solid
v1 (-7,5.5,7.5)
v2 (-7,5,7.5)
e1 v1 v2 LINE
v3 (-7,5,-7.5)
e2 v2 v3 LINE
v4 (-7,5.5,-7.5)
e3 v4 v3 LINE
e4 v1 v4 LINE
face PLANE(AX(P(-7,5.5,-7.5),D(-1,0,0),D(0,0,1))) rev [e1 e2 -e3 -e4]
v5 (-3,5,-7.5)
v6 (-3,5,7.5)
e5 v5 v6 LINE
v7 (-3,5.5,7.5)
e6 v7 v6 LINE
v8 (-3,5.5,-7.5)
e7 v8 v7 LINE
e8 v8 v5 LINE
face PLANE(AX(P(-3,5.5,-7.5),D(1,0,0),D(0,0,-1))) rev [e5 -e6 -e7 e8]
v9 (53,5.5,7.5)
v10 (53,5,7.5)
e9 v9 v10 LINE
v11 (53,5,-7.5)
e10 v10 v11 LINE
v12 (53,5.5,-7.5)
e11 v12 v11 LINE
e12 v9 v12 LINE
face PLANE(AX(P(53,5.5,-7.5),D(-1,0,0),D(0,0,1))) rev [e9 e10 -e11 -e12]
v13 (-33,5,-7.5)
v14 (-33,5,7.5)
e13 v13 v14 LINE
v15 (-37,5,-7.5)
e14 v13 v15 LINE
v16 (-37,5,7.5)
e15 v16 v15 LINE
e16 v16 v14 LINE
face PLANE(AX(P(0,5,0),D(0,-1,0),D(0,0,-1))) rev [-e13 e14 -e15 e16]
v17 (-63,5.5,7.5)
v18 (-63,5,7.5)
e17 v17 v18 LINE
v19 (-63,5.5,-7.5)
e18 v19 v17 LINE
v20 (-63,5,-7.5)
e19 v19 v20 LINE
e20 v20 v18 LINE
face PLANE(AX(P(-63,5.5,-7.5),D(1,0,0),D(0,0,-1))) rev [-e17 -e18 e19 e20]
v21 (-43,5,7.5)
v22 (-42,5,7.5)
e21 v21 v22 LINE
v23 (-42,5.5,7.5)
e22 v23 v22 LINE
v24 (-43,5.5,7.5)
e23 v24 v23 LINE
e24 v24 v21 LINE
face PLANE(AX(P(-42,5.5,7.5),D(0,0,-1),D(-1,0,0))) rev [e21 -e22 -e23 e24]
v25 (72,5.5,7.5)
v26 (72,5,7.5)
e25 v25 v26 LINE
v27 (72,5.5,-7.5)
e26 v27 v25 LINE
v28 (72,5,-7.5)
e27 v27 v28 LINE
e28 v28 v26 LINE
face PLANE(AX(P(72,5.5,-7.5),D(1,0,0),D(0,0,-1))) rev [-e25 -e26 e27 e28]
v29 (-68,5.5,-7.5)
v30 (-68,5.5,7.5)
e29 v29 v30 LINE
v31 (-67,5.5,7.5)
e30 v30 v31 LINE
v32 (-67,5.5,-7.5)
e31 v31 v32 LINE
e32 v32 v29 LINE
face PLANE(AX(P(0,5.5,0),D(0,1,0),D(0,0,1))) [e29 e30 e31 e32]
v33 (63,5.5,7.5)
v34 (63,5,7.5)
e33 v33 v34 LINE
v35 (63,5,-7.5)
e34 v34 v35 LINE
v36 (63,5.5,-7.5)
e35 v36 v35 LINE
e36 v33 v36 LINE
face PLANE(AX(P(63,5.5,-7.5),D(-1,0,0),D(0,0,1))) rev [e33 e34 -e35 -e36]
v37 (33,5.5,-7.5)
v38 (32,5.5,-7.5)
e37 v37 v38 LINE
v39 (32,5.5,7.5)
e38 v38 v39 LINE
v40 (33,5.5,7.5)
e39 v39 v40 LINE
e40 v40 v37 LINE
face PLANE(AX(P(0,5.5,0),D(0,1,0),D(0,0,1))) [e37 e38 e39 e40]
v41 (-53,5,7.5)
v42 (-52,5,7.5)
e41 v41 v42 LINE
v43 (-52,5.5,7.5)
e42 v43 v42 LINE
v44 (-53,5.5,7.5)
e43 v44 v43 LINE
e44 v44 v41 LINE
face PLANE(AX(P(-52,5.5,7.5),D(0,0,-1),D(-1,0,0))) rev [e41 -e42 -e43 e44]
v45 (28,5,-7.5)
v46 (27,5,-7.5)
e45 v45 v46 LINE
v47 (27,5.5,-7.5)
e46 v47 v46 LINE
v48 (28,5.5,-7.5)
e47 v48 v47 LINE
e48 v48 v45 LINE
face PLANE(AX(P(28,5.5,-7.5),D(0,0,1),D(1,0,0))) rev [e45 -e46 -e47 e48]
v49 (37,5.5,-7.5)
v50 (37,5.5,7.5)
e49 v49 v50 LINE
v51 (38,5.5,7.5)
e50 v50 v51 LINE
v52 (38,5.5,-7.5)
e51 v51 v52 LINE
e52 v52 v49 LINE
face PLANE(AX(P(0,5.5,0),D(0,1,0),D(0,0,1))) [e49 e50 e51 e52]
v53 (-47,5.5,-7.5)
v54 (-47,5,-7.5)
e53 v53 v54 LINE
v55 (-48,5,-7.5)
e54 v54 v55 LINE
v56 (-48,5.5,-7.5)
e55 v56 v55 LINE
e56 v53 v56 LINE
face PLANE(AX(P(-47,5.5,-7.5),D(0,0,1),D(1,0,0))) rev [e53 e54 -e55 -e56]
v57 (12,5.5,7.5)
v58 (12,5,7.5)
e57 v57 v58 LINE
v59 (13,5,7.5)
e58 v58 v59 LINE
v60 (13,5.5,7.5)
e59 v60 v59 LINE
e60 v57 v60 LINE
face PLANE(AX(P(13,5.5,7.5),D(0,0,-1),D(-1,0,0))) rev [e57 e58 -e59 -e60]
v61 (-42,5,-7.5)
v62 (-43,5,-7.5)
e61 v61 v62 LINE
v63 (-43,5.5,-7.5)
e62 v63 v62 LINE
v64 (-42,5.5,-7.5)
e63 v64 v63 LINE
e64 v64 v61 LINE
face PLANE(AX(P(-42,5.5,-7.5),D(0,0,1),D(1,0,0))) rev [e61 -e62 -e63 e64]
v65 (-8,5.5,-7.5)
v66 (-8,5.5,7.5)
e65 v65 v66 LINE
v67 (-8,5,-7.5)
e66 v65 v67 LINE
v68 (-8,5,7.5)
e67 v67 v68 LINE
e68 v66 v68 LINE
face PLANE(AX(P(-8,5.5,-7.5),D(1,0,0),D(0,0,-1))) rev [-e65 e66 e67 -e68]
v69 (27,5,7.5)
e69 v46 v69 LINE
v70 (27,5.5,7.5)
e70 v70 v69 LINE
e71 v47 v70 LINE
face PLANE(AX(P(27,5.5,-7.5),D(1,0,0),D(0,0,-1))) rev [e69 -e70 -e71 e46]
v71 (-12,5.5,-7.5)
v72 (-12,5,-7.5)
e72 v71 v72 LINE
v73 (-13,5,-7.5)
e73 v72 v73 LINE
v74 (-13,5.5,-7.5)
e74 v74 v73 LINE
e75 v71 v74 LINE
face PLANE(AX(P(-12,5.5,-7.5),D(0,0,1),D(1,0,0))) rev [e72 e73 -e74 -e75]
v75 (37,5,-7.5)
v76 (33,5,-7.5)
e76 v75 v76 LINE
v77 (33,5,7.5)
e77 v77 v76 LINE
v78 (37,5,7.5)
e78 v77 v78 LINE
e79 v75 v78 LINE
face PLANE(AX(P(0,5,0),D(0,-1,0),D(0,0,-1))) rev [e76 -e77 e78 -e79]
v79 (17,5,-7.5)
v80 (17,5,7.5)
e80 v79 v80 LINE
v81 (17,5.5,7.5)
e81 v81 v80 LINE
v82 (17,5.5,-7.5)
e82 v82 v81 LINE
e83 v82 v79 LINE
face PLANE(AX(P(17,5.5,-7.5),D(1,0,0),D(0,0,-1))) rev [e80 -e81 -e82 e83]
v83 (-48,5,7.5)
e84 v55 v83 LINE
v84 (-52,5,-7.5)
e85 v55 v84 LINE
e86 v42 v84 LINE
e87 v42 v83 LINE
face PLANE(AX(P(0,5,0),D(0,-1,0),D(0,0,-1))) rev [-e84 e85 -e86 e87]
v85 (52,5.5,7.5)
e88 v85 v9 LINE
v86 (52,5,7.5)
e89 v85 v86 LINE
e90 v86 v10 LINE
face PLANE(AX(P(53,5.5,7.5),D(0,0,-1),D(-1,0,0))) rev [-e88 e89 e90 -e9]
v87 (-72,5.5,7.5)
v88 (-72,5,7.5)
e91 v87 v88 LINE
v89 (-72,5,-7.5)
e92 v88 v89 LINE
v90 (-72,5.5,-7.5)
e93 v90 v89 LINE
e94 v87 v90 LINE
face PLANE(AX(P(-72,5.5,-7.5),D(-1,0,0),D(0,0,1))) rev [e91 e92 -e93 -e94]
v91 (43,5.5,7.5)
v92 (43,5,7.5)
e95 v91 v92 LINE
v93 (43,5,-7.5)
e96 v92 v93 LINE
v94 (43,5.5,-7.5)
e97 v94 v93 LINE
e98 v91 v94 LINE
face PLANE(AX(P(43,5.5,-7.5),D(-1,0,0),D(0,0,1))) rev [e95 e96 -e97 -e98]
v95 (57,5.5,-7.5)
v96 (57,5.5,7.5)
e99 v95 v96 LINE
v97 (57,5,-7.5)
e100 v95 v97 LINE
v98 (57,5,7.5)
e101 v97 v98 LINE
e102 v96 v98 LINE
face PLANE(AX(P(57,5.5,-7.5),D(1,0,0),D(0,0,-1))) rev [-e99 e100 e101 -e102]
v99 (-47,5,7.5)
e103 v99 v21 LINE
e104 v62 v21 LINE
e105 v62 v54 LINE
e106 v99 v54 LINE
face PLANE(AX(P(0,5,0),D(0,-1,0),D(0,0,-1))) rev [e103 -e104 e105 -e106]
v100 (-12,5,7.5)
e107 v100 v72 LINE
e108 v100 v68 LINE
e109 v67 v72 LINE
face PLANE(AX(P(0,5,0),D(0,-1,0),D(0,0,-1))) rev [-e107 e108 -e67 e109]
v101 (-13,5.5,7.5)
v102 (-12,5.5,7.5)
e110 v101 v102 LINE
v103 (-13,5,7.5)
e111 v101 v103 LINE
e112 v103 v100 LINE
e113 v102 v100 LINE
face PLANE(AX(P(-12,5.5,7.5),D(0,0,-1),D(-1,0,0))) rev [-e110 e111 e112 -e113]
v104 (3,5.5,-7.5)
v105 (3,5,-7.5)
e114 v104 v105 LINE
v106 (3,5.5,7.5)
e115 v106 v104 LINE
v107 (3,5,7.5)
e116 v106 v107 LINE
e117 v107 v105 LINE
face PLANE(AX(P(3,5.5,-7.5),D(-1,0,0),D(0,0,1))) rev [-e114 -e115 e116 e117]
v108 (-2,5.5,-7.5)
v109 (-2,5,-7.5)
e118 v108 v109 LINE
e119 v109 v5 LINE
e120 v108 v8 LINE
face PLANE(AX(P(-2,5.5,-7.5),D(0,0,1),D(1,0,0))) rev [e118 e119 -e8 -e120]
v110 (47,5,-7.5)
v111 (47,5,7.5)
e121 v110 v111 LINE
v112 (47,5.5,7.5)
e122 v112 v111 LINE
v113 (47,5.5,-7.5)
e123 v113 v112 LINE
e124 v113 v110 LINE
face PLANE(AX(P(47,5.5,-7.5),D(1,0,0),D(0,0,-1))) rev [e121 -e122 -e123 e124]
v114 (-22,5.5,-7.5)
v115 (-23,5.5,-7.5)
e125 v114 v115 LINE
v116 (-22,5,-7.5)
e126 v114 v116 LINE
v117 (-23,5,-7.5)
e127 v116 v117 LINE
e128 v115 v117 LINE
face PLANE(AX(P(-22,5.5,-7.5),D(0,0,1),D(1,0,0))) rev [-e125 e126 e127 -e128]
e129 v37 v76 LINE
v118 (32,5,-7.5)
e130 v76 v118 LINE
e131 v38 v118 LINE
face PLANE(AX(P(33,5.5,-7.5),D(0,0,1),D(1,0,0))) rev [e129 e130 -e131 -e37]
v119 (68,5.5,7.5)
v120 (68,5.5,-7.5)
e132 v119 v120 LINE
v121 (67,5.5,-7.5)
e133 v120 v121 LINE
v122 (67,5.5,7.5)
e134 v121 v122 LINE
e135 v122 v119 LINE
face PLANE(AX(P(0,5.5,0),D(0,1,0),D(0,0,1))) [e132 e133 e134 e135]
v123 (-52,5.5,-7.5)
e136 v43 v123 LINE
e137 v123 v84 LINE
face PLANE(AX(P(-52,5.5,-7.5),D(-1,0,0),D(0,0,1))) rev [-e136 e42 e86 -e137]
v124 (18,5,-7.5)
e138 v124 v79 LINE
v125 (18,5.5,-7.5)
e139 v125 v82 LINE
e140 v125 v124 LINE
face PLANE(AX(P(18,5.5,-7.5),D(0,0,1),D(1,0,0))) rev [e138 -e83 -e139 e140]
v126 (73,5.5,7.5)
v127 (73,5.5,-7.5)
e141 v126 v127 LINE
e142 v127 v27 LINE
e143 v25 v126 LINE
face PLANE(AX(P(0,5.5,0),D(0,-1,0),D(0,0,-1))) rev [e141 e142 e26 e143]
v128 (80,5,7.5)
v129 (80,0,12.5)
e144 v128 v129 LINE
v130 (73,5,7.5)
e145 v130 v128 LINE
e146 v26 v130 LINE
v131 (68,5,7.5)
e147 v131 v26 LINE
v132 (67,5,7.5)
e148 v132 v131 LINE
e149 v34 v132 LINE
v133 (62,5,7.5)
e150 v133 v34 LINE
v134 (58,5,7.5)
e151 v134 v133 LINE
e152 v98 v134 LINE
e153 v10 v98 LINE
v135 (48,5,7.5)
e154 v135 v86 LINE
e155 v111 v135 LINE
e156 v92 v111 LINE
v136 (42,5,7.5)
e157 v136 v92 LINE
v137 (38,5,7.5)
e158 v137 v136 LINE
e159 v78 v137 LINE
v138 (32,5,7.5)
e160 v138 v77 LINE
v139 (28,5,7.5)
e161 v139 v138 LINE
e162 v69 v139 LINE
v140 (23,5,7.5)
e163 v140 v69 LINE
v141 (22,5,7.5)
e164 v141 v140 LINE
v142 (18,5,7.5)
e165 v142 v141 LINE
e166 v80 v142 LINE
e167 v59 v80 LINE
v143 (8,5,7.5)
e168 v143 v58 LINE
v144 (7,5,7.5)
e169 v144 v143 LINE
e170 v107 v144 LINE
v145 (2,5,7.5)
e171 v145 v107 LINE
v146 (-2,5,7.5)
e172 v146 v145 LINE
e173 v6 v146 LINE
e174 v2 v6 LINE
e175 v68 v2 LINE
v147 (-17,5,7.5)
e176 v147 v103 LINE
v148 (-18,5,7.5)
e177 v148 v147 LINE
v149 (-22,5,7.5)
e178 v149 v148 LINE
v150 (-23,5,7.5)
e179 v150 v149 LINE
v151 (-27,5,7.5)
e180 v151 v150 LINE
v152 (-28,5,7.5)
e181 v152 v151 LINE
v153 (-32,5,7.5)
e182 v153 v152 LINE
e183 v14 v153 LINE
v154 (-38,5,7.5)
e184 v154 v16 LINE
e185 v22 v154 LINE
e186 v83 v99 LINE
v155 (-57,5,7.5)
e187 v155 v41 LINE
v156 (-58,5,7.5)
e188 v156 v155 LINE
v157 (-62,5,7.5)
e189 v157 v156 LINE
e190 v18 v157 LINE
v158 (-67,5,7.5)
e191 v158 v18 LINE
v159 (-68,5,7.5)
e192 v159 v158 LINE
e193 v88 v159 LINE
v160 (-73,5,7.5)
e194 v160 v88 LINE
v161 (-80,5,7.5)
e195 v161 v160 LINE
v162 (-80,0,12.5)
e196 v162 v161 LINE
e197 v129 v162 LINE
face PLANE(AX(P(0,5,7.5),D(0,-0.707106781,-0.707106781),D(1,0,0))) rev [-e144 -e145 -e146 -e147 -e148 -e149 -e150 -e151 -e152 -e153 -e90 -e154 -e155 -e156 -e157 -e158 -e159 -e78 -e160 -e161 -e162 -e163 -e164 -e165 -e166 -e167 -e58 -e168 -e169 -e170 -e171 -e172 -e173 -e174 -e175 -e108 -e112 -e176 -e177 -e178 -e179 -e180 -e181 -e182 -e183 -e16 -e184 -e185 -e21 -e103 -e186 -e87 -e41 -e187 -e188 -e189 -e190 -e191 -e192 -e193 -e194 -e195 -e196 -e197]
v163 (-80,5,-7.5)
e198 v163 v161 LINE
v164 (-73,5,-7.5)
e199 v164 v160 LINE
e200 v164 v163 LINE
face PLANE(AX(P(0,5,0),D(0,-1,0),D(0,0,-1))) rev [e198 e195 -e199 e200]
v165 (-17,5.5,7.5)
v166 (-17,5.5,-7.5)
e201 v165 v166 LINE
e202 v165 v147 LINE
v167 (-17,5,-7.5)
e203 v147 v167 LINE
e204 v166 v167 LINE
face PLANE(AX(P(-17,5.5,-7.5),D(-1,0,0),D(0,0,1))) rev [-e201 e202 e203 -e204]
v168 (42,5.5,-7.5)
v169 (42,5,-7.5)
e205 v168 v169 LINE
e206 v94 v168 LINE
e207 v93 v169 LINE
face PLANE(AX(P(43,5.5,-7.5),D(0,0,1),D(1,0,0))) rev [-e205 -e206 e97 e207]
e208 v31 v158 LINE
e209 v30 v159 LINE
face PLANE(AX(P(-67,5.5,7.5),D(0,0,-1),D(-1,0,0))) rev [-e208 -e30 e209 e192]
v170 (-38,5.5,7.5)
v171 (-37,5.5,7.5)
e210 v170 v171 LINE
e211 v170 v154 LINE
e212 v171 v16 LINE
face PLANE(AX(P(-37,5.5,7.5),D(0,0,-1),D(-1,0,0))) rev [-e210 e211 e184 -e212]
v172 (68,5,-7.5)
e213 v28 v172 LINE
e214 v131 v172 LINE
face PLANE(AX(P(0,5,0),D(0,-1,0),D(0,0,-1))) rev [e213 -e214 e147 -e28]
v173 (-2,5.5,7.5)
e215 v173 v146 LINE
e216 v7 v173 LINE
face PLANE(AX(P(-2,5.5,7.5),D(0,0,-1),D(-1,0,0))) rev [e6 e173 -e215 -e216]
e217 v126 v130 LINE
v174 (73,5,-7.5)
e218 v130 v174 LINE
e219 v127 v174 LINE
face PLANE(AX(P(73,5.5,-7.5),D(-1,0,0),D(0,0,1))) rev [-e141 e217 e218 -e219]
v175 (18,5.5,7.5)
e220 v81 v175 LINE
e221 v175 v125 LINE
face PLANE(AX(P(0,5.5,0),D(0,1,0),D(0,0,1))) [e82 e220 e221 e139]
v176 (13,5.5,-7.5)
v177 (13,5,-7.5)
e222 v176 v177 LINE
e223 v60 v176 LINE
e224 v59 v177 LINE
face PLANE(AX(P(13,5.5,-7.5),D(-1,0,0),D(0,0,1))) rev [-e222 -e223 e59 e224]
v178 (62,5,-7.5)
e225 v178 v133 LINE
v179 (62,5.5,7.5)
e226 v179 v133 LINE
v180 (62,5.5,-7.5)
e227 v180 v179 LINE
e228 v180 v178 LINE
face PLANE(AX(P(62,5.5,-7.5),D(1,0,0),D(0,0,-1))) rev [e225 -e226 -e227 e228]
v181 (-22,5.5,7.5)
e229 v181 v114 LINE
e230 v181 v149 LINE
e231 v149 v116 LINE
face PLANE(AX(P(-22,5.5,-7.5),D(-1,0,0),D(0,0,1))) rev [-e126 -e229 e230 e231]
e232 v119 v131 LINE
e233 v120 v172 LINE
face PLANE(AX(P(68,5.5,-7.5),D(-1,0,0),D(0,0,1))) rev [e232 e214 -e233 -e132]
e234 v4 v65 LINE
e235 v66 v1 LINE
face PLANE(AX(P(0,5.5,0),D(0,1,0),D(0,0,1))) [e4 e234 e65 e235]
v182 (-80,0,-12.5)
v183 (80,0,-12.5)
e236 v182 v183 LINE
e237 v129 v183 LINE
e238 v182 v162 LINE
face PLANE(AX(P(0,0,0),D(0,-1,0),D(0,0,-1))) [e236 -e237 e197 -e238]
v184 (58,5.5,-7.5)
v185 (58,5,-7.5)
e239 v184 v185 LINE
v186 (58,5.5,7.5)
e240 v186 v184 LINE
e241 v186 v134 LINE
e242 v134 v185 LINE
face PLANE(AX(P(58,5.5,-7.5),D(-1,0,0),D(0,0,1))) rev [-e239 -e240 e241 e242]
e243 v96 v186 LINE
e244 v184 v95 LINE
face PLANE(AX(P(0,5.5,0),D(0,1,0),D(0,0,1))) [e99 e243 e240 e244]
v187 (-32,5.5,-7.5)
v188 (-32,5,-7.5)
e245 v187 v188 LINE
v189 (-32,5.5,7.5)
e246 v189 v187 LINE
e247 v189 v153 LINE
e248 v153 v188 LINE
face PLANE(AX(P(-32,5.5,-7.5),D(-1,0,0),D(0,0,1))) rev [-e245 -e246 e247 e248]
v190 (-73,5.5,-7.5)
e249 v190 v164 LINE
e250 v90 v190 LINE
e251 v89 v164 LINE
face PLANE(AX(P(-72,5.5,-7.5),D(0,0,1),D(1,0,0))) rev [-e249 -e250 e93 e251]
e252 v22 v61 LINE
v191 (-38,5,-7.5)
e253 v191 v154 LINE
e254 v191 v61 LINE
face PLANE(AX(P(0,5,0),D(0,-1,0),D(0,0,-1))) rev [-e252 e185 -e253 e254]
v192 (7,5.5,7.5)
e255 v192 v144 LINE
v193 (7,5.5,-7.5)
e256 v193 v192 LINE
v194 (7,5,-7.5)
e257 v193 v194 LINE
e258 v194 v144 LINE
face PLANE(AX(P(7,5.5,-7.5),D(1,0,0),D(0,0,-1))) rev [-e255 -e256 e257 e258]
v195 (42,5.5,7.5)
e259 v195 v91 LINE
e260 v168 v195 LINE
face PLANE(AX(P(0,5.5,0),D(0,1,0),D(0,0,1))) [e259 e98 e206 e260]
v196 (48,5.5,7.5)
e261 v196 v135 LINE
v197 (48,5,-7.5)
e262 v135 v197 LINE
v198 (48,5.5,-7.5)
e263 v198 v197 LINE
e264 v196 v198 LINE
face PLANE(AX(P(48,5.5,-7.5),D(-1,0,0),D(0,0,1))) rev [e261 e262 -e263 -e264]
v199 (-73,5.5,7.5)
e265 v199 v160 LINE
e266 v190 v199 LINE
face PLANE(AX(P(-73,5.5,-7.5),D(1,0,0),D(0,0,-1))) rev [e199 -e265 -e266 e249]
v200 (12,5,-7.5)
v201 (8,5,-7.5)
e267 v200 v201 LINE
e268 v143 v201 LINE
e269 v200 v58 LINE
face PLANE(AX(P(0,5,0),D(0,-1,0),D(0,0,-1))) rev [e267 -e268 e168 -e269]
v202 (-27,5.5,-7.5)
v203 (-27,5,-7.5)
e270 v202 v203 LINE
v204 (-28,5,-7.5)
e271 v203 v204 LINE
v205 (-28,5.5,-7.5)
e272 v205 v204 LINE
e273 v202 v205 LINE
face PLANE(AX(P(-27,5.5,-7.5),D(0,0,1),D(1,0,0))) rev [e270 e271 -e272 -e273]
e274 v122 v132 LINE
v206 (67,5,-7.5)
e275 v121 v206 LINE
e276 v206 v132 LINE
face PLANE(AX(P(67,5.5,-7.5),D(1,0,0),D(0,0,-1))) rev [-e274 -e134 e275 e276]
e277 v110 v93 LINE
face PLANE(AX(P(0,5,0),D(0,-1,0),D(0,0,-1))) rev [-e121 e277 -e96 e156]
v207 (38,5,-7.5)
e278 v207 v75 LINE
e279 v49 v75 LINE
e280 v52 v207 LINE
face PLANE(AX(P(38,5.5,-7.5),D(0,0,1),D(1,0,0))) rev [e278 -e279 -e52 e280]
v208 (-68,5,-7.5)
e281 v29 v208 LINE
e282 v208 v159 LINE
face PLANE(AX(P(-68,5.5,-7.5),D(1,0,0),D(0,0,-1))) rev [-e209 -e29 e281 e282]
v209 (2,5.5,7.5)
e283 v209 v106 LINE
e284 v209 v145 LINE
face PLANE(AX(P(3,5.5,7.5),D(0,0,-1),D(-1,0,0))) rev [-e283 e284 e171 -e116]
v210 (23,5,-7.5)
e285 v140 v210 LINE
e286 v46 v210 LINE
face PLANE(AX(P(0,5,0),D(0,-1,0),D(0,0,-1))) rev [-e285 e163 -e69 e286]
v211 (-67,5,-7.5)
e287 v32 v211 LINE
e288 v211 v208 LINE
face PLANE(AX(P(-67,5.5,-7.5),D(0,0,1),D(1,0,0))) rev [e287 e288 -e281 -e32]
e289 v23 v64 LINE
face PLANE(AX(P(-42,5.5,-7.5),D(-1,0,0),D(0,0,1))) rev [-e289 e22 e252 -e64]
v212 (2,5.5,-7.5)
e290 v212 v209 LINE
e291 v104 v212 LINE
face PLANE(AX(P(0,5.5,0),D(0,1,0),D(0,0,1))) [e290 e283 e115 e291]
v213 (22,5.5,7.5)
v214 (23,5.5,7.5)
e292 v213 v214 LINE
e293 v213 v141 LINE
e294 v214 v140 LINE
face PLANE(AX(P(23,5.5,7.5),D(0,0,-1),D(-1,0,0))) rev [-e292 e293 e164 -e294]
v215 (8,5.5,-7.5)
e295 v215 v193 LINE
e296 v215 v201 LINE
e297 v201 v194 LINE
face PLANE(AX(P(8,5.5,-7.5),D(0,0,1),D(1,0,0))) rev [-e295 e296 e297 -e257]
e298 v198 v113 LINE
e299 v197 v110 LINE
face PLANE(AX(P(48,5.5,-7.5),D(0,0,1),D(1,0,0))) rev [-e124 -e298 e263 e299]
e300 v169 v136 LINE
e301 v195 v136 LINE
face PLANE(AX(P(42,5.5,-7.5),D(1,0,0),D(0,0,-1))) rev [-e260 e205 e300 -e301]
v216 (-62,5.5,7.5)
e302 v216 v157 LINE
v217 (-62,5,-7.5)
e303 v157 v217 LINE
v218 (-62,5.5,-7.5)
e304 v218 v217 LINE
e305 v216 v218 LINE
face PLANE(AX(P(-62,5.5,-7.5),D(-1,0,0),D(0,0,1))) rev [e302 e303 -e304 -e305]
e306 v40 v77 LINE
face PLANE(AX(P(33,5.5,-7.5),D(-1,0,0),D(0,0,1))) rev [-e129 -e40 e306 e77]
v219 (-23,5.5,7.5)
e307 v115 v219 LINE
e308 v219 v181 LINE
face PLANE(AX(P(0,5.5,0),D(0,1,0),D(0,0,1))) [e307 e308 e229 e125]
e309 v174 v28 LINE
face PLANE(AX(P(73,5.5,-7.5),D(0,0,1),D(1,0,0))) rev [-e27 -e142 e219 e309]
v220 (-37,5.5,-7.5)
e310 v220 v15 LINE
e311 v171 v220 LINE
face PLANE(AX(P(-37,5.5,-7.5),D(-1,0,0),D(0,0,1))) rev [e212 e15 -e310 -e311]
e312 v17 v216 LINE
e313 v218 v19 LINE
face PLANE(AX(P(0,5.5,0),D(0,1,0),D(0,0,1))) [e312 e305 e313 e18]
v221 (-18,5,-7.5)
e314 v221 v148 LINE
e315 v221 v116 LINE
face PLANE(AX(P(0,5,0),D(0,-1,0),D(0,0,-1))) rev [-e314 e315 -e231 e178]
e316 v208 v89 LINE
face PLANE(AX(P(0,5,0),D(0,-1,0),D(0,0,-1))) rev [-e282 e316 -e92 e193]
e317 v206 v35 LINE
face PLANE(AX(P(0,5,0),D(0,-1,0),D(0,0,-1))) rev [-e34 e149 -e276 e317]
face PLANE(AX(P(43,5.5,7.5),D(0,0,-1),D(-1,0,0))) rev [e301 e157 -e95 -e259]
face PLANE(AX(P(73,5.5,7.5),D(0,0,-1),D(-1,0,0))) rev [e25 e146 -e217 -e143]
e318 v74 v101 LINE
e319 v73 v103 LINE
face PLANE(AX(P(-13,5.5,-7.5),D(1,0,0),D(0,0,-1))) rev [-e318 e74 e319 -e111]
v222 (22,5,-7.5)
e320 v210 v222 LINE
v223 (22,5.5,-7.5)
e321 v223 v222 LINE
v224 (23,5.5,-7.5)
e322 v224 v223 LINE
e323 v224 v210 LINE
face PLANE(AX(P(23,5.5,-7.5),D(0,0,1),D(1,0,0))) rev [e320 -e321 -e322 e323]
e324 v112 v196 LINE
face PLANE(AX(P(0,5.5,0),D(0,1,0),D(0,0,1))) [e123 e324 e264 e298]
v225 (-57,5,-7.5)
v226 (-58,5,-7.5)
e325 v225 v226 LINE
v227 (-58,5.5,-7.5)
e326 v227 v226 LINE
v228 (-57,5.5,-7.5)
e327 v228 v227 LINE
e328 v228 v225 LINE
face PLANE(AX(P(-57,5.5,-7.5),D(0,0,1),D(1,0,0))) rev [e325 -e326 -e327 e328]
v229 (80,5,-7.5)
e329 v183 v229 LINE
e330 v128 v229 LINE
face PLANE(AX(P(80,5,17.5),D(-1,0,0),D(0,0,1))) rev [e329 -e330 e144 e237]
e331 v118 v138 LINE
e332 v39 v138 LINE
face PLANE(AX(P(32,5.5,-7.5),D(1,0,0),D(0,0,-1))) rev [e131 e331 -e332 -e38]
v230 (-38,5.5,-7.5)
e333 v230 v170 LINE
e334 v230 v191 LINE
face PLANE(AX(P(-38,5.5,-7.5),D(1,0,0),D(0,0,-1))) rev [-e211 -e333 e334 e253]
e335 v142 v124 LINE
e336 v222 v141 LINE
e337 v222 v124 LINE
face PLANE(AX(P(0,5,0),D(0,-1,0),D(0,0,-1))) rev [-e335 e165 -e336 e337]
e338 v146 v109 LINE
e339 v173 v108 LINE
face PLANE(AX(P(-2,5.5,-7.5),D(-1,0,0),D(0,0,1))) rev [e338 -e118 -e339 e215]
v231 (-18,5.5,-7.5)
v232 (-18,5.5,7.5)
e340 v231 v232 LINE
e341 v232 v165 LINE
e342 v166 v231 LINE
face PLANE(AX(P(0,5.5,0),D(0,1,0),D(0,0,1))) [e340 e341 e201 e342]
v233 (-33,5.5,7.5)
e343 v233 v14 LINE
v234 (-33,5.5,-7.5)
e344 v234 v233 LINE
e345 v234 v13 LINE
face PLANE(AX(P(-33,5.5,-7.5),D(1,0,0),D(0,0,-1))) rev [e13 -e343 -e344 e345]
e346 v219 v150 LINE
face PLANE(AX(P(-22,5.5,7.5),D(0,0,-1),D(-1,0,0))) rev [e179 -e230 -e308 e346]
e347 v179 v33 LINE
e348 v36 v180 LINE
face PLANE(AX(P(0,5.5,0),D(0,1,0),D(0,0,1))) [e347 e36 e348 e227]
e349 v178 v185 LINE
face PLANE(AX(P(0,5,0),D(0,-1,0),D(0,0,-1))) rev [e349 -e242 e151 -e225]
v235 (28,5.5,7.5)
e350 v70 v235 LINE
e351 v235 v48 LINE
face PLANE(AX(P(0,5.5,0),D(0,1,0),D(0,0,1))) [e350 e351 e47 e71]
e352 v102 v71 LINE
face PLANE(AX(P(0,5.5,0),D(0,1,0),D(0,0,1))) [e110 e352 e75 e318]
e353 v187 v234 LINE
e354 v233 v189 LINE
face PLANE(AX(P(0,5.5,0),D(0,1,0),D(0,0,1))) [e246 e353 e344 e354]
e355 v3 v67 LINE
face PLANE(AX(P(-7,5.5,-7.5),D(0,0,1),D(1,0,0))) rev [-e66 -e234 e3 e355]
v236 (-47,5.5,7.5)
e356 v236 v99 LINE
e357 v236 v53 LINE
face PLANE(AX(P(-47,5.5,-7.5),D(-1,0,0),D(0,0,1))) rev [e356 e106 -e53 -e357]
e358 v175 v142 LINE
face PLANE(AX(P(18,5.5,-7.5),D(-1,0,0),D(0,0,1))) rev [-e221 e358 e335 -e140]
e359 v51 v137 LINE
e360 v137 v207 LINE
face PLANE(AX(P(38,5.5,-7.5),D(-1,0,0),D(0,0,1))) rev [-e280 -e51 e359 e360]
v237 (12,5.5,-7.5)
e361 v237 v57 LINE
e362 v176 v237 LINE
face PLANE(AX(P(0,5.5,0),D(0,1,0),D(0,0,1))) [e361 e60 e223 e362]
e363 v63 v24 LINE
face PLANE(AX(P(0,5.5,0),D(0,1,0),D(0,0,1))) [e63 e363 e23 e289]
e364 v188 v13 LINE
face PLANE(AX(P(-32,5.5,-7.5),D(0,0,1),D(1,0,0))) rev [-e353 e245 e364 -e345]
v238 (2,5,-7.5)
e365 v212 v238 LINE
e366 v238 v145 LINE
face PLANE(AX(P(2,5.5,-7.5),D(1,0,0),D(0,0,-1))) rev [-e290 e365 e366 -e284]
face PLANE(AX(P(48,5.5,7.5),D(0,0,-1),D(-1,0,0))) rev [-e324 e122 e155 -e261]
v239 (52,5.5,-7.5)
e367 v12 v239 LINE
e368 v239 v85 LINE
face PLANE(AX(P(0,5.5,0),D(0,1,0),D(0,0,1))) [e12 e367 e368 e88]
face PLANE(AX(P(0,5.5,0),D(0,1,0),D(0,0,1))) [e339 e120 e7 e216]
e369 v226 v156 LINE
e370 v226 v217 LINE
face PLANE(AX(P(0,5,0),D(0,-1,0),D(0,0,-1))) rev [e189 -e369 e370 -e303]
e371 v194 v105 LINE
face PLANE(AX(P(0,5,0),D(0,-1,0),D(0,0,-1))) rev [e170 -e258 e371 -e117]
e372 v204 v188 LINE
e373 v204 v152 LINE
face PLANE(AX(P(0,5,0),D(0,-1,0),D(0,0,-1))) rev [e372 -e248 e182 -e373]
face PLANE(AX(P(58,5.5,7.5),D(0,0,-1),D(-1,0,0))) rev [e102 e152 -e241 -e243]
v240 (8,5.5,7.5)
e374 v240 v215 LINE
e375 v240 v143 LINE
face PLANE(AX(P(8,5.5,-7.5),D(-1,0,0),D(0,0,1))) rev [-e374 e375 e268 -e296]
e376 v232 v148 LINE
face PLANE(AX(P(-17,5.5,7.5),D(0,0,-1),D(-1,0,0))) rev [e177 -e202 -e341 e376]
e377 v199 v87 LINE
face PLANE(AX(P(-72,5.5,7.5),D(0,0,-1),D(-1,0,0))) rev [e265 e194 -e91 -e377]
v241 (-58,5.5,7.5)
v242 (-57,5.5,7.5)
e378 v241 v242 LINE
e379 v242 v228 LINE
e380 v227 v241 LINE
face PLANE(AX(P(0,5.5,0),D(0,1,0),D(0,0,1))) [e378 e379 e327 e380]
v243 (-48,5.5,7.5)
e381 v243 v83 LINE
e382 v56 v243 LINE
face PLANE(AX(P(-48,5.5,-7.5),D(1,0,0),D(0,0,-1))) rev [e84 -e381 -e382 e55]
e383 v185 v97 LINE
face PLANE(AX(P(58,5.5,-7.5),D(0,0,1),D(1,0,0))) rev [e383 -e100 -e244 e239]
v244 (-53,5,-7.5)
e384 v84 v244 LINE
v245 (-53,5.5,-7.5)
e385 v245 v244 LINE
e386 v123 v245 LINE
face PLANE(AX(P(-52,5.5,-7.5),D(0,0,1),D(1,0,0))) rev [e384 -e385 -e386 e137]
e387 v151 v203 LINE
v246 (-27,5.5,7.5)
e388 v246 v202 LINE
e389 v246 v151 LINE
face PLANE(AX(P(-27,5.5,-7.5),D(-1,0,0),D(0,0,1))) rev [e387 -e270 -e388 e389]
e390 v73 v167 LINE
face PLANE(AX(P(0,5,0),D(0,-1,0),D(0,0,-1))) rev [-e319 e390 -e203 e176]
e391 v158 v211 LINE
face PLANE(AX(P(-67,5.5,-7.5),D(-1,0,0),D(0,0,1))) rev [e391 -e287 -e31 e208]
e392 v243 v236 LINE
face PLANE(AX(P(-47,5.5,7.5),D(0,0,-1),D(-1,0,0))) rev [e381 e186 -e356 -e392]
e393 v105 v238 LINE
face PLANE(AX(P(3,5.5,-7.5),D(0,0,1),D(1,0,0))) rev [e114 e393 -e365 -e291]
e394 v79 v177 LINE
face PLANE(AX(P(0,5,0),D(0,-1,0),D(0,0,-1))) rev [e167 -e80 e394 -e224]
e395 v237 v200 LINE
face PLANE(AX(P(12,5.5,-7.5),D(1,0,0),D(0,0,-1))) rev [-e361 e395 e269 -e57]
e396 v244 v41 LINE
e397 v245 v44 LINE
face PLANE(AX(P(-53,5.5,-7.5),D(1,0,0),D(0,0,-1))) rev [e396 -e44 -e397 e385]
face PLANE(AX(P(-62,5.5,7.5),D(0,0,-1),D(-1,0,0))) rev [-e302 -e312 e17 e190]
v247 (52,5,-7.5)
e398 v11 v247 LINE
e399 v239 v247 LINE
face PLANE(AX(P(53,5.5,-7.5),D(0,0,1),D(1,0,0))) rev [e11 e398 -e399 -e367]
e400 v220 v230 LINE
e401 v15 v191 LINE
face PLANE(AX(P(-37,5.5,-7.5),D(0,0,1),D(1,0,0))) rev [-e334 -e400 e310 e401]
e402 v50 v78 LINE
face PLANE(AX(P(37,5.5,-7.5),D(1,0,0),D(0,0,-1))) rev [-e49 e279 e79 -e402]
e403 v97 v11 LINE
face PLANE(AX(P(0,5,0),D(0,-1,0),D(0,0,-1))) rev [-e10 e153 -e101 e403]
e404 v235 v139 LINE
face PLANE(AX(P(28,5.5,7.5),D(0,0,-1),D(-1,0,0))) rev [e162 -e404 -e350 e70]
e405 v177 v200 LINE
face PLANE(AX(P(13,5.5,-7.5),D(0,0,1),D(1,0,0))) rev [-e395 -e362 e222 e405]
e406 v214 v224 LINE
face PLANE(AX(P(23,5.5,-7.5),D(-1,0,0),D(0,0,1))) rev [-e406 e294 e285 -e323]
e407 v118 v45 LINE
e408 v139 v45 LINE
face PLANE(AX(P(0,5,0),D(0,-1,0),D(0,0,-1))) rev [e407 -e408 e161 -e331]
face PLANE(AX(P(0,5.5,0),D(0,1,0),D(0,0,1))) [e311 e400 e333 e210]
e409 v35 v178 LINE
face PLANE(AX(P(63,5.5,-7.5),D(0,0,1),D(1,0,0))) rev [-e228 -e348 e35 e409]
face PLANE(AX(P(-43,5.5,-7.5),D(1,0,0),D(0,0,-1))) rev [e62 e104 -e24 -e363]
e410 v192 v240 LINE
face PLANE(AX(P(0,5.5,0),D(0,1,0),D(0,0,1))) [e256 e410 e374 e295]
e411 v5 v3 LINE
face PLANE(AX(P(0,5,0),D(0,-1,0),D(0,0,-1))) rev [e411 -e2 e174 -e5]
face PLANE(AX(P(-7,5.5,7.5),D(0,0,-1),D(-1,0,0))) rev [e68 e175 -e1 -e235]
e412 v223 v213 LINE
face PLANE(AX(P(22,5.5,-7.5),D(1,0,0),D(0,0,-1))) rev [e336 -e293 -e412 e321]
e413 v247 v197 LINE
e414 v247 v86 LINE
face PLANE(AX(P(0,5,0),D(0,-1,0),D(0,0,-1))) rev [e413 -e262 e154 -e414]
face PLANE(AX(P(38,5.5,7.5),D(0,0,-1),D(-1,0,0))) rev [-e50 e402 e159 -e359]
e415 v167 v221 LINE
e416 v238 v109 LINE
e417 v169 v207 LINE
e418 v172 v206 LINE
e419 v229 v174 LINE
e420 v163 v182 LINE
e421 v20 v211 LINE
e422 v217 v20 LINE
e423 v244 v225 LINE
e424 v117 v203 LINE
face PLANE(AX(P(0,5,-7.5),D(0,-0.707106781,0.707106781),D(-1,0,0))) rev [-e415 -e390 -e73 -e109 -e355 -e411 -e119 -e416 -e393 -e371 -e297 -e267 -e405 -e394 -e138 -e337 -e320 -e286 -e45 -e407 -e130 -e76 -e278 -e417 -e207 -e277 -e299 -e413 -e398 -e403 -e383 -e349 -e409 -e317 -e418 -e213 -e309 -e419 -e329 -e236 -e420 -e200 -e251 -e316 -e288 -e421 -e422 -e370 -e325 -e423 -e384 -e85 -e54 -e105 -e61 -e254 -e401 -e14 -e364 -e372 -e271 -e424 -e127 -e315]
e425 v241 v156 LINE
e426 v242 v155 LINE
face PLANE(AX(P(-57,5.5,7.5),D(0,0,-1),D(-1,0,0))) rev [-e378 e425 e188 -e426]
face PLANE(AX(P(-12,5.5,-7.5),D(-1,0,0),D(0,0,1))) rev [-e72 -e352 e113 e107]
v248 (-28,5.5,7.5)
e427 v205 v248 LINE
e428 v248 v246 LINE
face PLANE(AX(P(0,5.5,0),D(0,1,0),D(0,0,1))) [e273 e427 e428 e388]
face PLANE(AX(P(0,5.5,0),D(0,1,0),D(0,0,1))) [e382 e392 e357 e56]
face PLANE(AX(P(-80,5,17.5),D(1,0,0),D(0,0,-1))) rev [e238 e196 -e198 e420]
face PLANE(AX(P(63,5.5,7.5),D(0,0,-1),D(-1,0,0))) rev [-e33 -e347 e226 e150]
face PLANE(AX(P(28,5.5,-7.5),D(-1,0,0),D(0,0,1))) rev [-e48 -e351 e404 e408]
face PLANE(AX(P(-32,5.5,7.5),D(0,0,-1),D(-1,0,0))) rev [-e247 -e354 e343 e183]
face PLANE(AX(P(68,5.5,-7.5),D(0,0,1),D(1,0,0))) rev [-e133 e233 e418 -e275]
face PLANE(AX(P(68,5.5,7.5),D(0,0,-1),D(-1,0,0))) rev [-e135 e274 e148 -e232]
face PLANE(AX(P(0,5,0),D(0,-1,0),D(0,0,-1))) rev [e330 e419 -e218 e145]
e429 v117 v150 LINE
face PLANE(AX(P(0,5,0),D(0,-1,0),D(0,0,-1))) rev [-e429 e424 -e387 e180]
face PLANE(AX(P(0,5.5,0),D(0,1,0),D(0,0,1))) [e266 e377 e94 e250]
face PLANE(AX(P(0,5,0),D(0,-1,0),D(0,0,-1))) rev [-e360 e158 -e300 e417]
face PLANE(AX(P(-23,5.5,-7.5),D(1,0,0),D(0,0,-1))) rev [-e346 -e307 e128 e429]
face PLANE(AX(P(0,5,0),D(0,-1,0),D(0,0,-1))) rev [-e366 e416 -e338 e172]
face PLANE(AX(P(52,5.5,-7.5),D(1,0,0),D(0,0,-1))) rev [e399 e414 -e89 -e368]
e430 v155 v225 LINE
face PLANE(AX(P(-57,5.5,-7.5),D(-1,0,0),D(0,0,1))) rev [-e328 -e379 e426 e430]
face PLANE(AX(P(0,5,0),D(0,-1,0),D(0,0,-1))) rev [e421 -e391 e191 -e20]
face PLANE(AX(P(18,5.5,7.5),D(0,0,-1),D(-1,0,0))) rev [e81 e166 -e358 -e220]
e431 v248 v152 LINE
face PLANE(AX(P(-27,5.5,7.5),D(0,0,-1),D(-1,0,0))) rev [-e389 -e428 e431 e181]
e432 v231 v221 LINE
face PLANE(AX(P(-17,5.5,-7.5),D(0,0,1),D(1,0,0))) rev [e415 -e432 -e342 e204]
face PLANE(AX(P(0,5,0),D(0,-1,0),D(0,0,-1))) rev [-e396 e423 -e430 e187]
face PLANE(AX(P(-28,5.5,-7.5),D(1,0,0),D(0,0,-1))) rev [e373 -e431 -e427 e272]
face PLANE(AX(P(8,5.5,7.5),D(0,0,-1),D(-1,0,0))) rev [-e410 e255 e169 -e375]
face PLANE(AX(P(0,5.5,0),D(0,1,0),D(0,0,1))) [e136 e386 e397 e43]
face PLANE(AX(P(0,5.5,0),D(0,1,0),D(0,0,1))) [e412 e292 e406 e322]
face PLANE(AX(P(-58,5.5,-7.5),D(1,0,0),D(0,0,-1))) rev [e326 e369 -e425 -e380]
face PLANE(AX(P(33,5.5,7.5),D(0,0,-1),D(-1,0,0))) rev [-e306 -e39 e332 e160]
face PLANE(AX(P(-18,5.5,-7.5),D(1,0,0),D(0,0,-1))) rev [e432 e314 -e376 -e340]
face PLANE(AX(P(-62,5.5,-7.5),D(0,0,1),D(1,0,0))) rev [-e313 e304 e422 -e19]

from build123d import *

# Parameters (mm, degrees)
SKETCH1_W           = 160
SKETCH1_H           = 35
BOSS_EXTRUDE1_DEPTH = 5
CHAMFER1_SIZE       = 10
SKETCH2_W           = 1
SKETCH2_H           = 15
BOSS_EXTRUDE2_DEPTH = 0.5


with BuildPart() as part:
    # Sketch1 → Boss-Extrude1 (new body)
    with BuildSketch(Plane(origin=(0, 0, 0), x_dir=(1, 0, 0), z_dir=(0, 1, 0))):
        Rectangle(SKETCH1_W, SKETCH1_H)
    extrude(amount=BOSS_EXTRUDE1_DEPTH)

    # Chamfer1
    # the kernel refuses this chamfer: 10 mm, written as the material it takes off along each edge
    with BuildSketch(Plane(origin=(105.71682988, 5, -17.5), x_dir=(0, -0.9996219169112968, -0.027495876610586317), z_dir=(-1, 0, 0)), Plane(origin=(-105.71682988, 5, 17.5), x_dir=(0, -0.9996219169112968, 0.027495876610586317), z_dir=(1, 0, 0))) as chamfer1_piece_1:
        Polygon((CHAMFER1_SIZE * 0.999621916911, CHAMFER1_SIZE * 0.0274958766106), (-CHAMFER1_SIZE * 0.0274958766106, CHAMFER1_SIZE * 0.999621916911), (0, 0), align=None)
    extrude(amount=211.433659759, mode=Mode.SUBTRACT)

    # Sketch2 → Boss-Extrude2 (add)
    with BuildSketch(Plane(origin=(0, 5, 0), x_dir=(1, 0, 0), z_dir=(0, 1, 0))):
        with Locations((72.5, 0)):
            Rectangle(SKETCH2_W, SKETCH2_H)
        with Locations((67.5, 0)):
            Rectangle(SKETCH2_W, SKETCH2_H)
        with Locations((62.5, 0)):
            Rectangle(SKETCH2_W, SKETCH2_H)
        with Locations((57.5, 0)):
            Rectangle(SKETCH2_W, SKETCH2_H)
        with Locations((52.5, 0)):
            Rectangle(SKETCH2_W, SKETCH2_H)
        with Locations((47.5, 0)):
            Rectangle(SKETCH2_W, SKETCH2_H)
        with Locations((42.5, 0)):
            Rectangle(SKETCH2_W, SKETCH2_H)
        with Locations((37.5, 0)):
            Rectangle(SKETCH2_W, SKETCH2_H)
        with Locations((32.5, 0)):
            Rectangle(SKETCH2_W, SKETCH2_H)
        with Locations((27.5, 0)):
            Rectangle(SKETCH2_W, SKETCH2_H)
        with Locations((22.5, 0)):
            Rectangle(SKETCH2_W, SKETCH2_H)
        with Locations((17.5, 0)):
            Rectangle(SKETCH2_W, SKETCH2_H)
        with Locations((12.5, 0)):
            Rectangle(SKETCH2_W, SKETCH2_H)
        with Locations((7.5, 0)):
            Rectangle(SKETCH2_W, SKETCH2_H)
        with Locations((2.5, 0)):
            Rectangle(SKETCH2_W, SKETCH2_H)
        with Locations((-2.5, 0)):
            Rectangle(SKETCH2_W, SKETCH2_H)
        with Locations((-7.5, 0)):
            Rectangle(SKETCH2_W, SKETCH2_H)
        with Locations((-12.5, 0)):
            Rectangle(SKETCH2_W, SKETCH2_H)
        with Locations((-17.5, 0)):
            Rectangle(SKETCH2_W, SKETCH2_H)
        with Locations((-22.5, 0)):
            Rectangle(SKETCH2_W, SKETCH2_H)
        with Locations((-27.5, 0)):
            Rectangle(SKETCH2_W, SKETCH2_H)
        with Locations((-32.5, 0)):
            Rectangle(SKETCH2_W, SKETCH2_H)
        with Locations((-37.5, 0)):
            Rectangle(SKETCH2_W, SKETCH2_H)
        with Locations((-42.5, 0)):
            Rectangle(SKETCH2_W, SKETCH2_H)
        with Locations((-47.5, 0)):
            Rectangle(SKETCH2_W, SKETCH2_H)
        with Locations((-52.5, 0)):
            Rectangle(SKETCH2_W, SKETCH2_H)
        with Locations((-57.5, 0)):
            Rectangle(SKETCH2_W, SKETCH2_H)
        with Locations((-62.5, 0)):
            Rectangle(SKETCH2_W, SKETCH2_H)
        with Locations((-67.5, 0)):
            Rectangle(SKETCH2_W, SKETCH2_H)
        with Locations((-72.5, 0)):
            Rectangle(SKETCH2_W, SKETCH2_H)
    extrude(amount=BOSS_EXTRUDE2_DEPTH)


solid = part.part
